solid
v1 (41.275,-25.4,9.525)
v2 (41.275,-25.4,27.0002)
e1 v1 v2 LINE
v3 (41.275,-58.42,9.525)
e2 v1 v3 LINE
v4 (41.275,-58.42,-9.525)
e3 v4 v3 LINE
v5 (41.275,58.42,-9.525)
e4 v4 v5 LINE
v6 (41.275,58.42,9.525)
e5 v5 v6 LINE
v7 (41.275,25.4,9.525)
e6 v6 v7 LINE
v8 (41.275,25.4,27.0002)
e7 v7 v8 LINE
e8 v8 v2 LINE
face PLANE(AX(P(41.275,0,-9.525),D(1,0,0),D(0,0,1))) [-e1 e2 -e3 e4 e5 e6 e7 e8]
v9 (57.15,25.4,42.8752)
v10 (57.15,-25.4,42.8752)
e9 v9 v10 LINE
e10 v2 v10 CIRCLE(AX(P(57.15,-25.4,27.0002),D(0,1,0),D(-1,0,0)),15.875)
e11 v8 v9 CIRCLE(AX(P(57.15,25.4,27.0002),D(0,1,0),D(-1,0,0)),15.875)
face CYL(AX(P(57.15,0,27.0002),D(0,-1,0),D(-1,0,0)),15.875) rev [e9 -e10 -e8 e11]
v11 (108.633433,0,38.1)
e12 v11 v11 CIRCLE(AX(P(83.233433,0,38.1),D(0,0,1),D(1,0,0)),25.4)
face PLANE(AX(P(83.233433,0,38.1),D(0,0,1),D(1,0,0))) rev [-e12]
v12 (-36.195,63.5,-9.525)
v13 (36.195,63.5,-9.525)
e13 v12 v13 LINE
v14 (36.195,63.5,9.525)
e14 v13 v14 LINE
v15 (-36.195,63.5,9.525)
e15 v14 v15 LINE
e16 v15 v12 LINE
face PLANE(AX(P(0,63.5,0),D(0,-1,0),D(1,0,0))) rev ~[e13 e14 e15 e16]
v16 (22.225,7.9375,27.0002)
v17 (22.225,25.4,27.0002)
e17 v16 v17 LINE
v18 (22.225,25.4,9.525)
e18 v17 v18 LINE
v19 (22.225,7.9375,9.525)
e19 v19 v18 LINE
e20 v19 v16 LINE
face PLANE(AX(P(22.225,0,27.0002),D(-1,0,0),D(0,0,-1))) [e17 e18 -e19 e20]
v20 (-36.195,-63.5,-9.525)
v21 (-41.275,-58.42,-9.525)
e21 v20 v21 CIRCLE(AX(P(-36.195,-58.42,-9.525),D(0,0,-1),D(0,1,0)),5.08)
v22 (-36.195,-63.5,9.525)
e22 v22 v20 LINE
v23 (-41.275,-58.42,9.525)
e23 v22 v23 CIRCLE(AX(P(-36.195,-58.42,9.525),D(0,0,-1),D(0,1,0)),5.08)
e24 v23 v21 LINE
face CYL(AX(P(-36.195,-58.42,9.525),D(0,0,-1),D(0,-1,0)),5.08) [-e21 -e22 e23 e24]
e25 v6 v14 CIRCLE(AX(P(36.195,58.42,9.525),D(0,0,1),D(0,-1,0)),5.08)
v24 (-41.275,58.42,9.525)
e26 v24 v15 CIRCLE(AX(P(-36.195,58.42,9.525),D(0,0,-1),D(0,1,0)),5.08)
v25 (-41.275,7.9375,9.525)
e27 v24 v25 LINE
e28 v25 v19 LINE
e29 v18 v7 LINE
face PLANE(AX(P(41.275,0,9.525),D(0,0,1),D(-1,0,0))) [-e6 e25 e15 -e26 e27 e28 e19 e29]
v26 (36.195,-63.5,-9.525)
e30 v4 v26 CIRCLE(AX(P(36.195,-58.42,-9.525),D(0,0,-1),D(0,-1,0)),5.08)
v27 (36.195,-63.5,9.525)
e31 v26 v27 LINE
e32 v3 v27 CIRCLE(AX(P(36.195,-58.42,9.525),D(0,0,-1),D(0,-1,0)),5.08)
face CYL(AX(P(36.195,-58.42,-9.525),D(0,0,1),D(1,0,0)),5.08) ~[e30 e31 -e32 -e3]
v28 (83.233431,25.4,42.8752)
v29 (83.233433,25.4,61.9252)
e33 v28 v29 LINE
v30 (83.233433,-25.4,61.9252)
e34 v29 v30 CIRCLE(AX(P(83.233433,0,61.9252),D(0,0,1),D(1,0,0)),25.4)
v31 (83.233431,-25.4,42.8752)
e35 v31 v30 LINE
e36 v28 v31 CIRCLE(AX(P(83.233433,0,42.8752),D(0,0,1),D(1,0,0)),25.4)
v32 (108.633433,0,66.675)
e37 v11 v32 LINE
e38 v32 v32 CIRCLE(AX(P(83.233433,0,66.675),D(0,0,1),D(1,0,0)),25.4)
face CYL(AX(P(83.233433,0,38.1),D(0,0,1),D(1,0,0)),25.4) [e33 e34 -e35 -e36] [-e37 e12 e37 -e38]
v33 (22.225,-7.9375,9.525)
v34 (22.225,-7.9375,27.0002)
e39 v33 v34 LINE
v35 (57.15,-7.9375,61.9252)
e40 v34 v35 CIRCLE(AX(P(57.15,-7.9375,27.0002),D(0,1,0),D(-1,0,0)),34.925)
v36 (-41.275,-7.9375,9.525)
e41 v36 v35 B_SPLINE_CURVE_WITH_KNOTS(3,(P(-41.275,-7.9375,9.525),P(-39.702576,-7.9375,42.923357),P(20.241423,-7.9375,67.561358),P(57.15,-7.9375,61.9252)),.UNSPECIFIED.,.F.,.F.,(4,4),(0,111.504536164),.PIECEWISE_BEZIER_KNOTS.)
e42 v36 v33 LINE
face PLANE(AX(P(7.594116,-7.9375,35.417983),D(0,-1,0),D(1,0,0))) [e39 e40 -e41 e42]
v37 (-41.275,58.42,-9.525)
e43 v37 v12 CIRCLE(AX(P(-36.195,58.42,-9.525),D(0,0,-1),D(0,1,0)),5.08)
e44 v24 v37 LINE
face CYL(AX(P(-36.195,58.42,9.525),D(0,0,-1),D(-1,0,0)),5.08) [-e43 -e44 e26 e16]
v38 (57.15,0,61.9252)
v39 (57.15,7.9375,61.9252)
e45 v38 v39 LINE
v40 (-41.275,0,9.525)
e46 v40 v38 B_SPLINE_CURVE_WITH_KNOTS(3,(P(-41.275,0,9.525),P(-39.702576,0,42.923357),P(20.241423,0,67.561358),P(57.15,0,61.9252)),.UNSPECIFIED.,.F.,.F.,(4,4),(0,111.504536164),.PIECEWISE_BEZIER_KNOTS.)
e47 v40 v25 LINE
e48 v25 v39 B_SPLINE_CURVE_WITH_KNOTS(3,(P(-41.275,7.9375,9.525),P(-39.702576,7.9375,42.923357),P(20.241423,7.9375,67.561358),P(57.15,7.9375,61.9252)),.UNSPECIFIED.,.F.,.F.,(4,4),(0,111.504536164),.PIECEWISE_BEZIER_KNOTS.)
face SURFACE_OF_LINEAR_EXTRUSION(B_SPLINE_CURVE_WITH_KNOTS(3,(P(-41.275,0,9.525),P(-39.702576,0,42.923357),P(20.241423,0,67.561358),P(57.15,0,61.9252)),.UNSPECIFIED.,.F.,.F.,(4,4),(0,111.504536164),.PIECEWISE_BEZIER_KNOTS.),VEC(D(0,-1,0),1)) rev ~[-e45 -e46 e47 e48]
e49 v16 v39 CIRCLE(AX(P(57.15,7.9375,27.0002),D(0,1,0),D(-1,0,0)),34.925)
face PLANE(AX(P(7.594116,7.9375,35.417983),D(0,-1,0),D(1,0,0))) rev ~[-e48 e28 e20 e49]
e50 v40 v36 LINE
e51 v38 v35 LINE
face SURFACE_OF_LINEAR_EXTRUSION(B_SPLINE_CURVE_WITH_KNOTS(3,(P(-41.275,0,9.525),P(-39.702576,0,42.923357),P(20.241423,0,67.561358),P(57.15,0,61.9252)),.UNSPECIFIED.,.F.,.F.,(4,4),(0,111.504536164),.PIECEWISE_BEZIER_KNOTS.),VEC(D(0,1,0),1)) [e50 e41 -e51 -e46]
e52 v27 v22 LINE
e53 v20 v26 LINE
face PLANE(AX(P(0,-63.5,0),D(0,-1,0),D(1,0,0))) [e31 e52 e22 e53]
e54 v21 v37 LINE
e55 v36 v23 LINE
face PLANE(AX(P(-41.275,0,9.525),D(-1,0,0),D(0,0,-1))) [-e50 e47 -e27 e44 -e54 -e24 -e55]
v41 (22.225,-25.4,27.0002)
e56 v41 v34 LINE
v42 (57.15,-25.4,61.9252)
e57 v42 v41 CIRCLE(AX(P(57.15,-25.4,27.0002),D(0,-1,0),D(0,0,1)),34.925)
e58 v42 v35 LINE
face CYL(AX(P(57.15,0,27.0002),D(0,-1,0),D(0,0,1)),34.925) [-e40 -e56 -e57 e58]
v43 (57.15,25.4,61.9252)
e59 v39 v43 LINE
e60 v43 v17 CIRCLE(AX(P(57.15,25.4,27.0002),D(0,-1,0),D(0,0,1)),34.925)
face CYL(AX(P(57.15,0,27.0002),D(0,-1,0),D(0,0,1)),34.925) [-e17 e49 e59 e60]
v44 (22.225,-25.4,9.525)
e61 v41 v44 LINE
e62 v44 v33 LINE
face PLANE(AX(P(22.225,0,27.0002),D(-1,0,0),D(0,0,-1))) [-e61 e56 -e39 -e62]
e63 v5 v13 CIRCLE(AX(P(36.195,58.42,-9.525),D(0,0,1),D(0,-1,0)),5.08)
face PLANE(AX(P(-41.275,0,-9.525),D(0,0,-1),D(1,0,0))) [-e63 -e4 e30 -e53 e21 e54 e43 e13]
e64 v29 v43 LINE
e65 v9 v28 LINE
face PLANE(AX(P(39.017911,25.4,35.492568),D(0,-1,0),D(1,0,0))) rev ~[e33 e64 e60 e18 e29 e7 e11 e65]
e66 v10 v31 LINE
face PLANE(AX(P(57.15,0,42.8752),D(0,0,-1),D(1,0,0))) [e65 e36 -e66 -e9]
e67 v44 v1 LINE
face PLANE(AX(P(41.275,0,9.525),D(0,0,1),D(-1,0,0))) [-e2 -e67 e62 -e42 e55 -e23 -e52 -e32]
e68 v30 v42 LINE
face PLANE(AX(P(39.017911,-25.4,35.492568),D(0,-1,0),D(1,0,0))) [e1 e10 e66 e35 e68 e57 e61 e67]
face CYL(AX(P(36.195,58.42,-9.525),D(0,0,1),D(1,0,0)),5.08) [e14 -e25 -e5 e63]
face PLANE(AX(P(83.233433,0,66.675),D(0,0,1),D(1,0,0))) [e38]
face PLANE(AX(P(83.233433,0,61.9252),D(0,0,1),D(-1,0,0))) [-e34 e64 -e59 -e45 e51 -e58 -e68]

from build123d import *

# Parameters (mm, degrees)
F1_DEPTH = 63.5
F2_DEPTH = 25.4
F3_DEPTH = 7.9375
F5_R     = 5.08


# Not quite as in the source:
# - ends of sketch curves that miss each other by under 0.0002 mm in the source are joined


with BuildPart() as f1:
    # F0 (on Front) → F1 (new body, symmetric)
    with BuildSketch(Plane.XZ):
        Polygon((41.275, -9.525), (41.275, 9.525), (22.225, 9.525), (-41.275, 9.525), (-41.275, -9.525), align=None)
    extrude(amount=F1_DEPTH, both=True)

    # F0 (on Front) → F2 (join, symmetric)
    with BuildSketch(Plane.XZ):
        with BuildLine():
            Line((22.225, 9.525), (41.275, 9.525))
            Line((41.275, 9.525), (41.275, 27.0002))
            ThreePointArc((41.275, 27.0002), (45.9246798487, 38.2255201513), (57.15, 42.8752))
            Line((57.15, 42.8752), (57.8334331512, 42.8752))
            Line((57.8334331512, 42.8752), (57.8334331512, 61.9252))
            Line((57.8334331512, 61.9252), (57.15, 61.9252))
            ThreePointArc((57.15, 61.9252), (32.4542956671, 51.6959043329), (22.225, 27.0002))
            Line((22.225, 27.0002), (22.225, 9.525))
        make_face()
        Polygon((57.8334331512, 61.9252), (57.8334331512, 42.8752), (83.2334309816, 42.8752), (83.2334331512, 61.9252), align=None)
    extrude(amount=F2_DEPTH, both=True)

    # F0 (on Front) → F3 (join, symmetric)
    with BuildSketch(Plane.XZ):
        with BuildLine():
            Line((-41.275, 9.525), (22.225, 9.525))
            Line((22.225, 9.525), (22.225, 27.0002))
            ThreePointArc((22.225, 27.0002), (32.4542956671, 51.6959043329), (57.15, 61.9252))
            add(Edge.make_bspline(
                [(-41.275, 9.525), (-39.7025756538, 42.9233573377), (20.2414225787, 67.5613582134), (57.15, 61.9252)],
                knots=[0, 0, 0, 0, 111.5045361635, 111.5045361635, 111.5045361635, 111.5045361635], degree=3))
        make_face()
    extrude(amount=F3_DEPTH, both=True)

    # F0 (on Front) → F4 (revolve)
    with BuildSketch(Plane.XZ):
        Polygon((83.2334331512, 61.9252), (83.2334331512, 42.8752), (83.2334331512, 38.1), (108.6334331512, 38.1), (108.6334331512, 66.675), (83.2334331512, 66.675), align=None)
    revolve(axis=Axis((83.2334331512, 0, 52.3875), (0, 0, 1)))

    # F5
    f5_edges = [f1.edges().sort_by_distance(p)[0] for p in [
        (-41.275, -63.5, 0),
        (41.275, -63.5, 0),
        (-41.275, 63.5, 0),
        (41.275, 63.5, 0),
    ]]
    fillet(f5_edges, radius=F5_R)


solid = f1.part
